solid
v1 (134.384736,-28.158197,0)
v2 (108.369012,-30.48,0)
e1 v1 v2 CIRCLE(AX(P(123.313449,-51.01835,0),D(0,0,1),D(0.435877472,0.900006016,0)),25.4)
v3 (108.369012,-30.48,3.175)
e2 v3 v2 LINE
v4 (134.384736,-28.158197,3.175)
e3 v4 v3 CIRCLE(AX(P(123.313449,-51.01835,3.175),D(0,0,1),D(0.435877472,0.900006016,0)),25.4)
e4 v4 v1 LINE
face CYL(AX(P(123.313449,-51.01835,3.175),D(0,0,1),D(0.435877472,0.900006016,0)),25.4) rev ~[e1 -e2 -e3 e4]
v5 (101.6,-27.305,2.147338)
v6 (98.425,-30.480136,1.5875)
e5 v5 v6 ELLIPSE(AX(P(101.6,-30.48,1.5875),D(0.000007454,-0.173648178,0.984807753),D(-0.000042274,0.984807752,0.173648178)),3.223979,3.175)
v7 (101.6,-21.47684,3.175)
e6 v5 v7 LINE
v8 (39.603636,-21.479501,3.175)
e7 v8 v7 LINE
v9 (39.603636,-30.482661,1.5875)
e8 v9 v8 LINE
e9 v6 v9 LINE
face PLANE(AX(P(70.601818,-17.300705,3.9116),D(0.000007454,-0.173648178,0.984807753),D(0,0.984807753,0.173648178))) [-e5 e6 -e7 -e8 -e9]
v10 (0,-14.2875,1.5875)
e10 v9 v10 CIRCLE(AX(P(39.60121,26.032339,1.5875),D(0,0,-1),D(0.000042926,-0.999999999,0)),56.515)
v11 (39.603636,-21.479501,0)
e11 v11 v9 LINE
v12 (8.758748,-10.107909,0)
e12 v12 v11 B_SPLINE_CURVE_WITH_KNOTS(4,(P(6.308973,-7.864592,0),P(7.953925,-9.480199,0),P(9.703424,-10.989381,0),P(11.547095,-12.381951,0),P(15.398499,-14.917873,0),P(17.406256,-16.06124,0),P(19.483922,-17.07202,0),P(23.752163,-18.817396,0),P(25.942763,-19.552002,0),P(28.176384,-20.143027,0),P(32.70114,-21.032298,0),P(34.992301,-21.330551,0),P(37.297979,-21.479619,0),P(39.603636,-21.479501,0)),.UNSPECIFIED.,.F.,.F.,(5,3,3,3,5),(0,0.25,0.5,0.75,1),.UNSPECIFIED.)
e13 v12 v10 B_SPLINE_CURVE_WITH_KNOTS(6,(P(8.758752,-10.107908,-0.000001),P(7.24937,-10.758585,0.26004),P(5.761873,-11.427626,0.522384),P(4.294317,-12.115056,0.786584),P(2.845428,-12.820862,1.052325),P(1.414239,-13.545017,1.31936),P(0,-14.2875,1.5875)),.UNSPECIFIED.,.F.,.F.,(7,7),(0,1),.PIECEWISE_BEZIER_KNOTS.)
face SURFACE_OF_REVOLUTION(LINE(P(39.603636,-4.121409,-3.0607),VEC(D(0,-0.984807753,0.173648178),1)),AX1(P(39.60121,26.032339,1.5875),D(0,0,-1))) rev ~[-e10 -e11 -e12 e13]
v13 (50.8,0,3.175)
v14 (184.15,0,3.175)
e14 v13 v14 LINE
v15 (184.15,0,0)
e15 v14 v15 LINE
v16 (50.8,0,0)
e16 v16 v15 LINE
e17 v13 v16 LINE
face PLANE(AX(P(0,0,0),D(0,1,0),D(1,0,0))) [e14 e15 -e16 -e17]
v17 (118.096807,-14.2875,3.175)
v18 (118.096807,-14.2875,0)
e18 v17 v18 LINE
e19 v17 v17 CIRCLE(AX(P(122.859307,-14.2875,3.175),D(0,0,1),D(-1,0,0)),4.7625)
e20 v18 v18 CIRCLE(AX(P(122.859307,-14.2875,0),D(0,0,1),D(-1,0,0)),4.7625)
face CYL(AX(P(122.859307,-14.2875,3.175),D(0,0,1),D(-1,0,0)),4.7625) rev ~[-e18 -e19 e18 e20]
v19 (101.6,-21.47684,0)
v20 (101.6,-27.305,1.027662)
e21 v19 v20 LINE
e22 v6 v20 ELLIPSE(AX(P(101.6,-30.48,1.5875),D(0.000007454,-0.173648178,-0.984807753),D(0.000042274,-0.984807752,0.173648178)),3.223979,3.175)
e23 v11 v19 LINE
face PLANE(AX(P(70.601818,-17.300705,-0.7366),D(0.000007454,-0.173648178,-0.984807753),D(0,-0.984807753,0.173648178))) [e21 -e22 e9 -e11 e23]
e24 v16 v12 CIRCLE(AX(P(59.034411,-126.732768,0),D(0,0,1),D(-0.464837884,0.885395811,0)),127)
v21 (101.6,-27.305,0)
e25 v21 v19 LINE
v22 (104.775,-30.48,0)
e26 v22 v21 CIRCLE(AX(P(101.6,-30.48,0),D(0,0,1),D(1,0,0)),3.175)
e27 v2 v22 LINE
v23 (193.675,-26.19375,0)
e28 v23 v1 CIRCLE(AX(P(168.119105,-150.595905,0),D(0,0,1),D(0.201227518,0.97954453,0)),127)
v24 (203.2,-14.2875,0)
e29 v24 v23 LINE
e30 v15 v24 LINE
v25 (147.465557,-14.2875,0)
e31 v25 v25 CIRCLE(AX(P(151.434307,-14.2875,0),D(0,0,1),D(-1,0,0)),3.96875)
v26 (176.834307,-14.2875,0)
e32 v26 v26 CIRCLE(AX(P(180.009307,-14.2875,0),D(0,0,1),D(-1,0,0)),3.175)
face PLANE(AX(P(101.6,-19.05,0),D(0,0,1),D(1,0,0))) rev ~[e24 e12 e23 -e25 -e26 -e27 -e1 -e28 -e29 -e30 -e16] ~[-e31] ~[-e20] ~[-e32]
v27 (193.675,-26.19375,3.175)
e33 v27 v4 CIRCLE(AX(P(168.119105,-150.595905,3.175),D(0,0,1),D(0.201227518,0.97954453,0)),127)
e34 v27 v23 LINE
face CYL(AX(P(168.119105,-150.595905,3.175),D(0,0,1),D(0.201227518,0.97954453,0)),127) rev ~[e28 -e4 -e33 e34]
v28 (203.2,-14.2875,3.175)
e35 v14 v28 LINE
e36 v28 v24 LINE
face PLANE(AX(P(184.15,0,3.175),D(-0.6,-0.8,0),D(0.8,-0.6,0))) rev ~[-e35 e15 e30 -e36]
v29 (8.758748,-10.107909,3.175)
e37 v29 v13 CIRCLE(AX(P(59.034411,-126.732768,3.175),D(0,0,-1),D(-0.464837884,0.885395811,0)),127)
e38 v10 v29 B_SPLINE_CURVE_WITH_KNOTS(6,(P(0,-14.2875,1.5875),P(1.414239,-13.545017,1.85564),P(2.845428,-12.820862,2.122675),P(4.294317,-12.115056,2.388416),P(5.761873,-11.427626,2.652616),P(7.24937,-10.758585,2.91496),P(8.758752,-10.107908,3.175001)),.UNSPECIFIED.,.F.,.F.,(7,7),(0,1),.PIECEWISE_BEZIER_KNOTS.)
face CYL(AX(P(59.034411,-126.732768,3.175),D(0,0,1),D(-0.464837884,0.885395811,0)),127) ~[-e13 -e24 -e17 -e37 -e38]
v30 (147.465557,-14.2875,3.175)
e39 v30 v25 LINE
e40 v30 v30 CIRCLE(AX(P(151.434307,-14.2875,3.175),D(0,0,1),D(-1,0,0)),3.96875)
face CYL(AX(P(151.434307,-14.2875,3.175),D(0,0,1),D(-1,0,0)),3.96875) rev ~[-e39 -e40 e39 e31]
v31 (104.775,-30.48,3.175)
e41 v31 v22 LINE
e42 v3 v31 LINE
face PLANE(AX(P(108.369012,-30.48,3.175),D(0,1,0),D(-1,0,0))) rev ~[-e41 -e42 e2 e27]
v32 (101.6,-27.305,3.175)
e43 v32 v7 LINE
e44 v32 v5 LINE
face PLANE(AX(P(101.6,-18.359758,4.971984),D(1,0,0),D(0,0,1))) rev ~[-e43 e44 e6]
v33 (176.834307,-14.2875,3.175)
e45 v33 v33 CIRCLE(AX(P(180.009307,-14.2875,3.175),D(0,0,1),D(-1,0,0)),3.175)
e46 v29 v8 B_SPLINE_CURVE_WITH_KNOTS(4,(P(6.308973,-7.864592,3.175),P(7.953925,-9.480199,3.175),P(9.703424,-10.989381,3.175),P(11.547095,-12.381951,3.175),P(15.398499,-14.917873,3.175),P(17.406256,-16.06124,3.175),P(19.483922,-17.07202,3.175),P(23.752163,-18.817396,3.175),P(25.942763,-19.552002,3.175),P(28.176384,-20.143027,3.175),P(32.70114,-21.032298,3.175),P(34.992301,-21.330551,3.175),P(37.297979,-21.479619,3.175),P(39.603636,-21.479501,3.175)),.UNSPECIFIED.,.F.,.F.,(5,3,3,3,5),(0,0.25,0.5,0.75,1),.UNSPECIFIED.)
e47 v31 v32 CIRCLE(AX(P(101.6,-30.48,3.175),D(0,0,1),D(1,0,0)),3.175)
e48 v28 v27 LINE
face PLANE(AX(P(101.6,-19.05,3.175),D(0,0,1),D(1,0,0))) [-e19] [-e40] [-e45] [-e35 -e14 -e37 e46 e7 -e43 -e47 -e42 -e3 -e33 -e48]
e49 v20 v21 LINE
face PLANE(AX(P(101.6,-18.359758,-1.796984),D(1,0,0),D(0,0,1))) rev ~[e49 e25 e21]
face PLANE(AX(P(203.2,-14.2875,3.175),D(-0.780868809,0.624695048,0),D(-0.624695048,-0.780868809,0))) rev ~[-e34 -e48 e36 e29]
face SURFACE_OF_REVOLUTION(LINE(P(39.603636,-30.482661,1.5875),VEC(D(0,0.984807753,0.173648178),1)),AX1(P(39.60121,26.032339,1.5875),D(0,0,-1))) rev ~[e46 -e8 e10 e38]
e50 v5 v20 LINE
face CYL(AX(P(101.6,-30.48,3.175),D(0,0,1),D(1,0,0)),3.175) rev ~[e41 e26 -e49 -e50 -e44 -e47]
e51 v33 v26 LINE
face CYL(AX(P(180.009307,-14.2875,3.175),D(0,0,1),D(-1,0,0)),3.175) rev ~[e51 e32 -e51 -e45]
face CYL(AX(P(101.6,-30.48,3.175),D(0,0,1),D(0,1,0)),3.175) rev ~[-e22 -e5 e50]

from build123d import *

# Parameters (mm, degrees)
F0_W     = 203.2
F0_H     = 38.1
F1_DEPTH = 3.175
F2_W     = 3.175
F2_H     = 4.445
F3_DEPTH = 25.4


# Not quite as in the source:
# - a feature names something its author has since deleted; it is built from what else it names


with BuildPart() as f1:
    # F0 (on Top) → F1 (new body)
    with BuildSketch(Plane.XY):
        with Locations((101.6, -19.05)):
            Rectangle(F0_W, F0_H)
    extrude(amount=F1_DEPTH)

    # F2 (on face) → F3 (cut)
    with BuildSketch(Plane.XY.offset(3.175)):
        with BuildLine():
            Line((0, -9.525), (0, -14.2875))
            ThreePointArc((0, -14.2875), (24.649723028, -4.4760985439), (50.8, 0))
            Line((50.8, 0), (0, 0))
            Line((0, 0), (0, -9.525))
        make_face()
        with Locations((103.1875, -35.8775)):
            Rectangle(F2_W, F2_H)
        with BuildLine():
            ThreePointArc((104.775, -30.48), (103.8450640303, -32.7250640303), (101.6, -33.655))
            Line((101.6, -33.655), (104.775, -33.655))
            Line((104.775, -33.655), (104.775, -30.48))
        make_face()
        with BuildLine():
            Line((104.775, -30.48), (101.6, -30.48))
            Line((101.6, -30.48), (101.6, -33.655))
            ThreePointArc((101.6, -33.655), (103.8450640303, -32.7250640303), (104.775, -30.48))
        make_face()
        with BuildLine():
            Line((101.6, -27.305), (101.6, -30.48))
            Line((101.6, -30.48), (104.775, -30.48))
            ThreePointArc((104.775, -30.48), (103.8450640303, -28.2349359697), (101.6, -27.305))
        make_face()
        with BuildLine():
            Line((98.4250000029, -30.4801362911), (101.6, -30.48))
            Line((101.6, -30.48), (101.6, -27.305))
            ThreePointArc((101.6, -27.305), (99.3548877841, -28.2349841564), (98.4250000029, -30.4801362911))
        make_face()
        with BuildLine():
            Line((101.6, -33.655), (101.6, -30.48))
            Line((101.6, -30.48), (98.4250000029, -30.4801362911))
            ThreePointArc((98.4250000029, -30.4801362911), (99.3549841564, -32.7251122159), (101.6, -33.655))
        make_face()
        with BuildLine():
            ThreePointArc((108.3690122037, -30.48), (106.4969075417, -31.9824905065), (104.775, -33.655))
            Line((104.775, -33.655), (104.775, -38.1))
            Line((104.775, -38.1), (184.15, -38.1))
            Line((184.15, -38.1), (193.675, -26.19375))
            ThreePointArc((193.675, -26.19375), (163.9135585822, -23.6655567526), (134.3847364187, -28.1581971794))
            ThreePointArc((134.3847364187, -28.1581971794), (121.0555708247, -25.7189035938), (108.3690122037, -30.48))
        make_face()
        with BuildLine():
            Line((101.6, -38.1), (101.6, -33.655))
            ThreePointArc((101.6, -33.655), (99.3549841564, -32.7251122159), (98.4250000029, -30.4801362911))
            Line((98.4250000029, -30.4801362911), (39.6036359929, -30.4826612755))
            ThreePointArc((39.6036359929, -30.4826612755), (18.2099329026, -26.2778753266), (0, -14.2875))
            Line((0, -14.2875), (0, -19.05))
            Line((0, -19.05), (0, -38.1))
            Line((0, -38.1), (101.6, -38.1))
        make_face()
        Polygon((203.2, 0), (184.15, 0), (203.2, -14.2875), align=None)
        Polygon((193.675, -26.19375), (184.15, -38.1), (203.2, -38.1), (203.2, -19.05), (203.2, -14.2875), align=None)
        with BuildLine():
            Line((108.3690122037, -30.48), (104.775, -30.48))
            Line((104.775, -30.48), (104.775, -33.655))
            ThreePointArc((104.775, -33.655), (106.4969075417, -31.9824905065), (108.3690122037, -30.48))
        make_face()
        with BuildLine():
            ThreePointArc((127.6218066335, -14.2875), (122.8593066335, -9.525), (118.0968066335, -14.2875))
            Line((118.0968066335, -14.2875), (127.6218066335, -14.2875))
        make_face()
        with BuildLine():
            Line((127.6218066335, -14.2875), (118.0968066335, -14.2875))
            ThreePointArc((118.0968066335, -14.2875), (122.8593066335, -19.05), (127.6218066335, -14.2875))
        make_face()
        with BuildLine():
            Line((176.8343066335, -14.2875), (183.1843066335, -14.2875))
            ThreePointArc((183.1843066335, -14.2875), (180.0093066335, -11.1125), (176.8343066335, -14.2875))
        make_face()
        with BuildLine():
            ThreePointArc((176.8343066335, -14.2875), (180.0093066335, -17.4625), (183.1843066335, -14.2875))
            Line((183.1843066335, -14.2875), (176.8343066335, -14.2875))
        make_face()
        with BuildLine():
            ThreePointArc((155.4030566335, -14.2875), (151.4343066335, -10.31875), (147.4655566335, -14.2875))
            Line((147.4655566335, -14.2875), (155.4030566335, -14.2875))
        make_face()
        with BuildLine():
            Line((155.4030566335, -14.2875), (147.4655566335, -14.2875))
            ThreePointArc((147.4655566335, -14.2875), (151.4343066335, -18.25625), (155.4030566335, -14.2875))
        make_face()
    extrude(amount=-F3_DEPTH, mode=Mode.SUBTRACT)

    # F8: sweep along a path in F5
    with BuildLine(Plane.XY.offset(1.5875)) as f8_path:
        Line((101.6, -30.48), (39.6036359929, -30.4826612755))
        ThreePointArc((39.6036359929, -30.4826612755), (18.2099329026, -26.2778753266), (0, -14.2875))
    # F7 (on offset) → F8 (sweep, cut)
    with BuildSketch(Plane.YZ.offset(101.6)):
        Polygon((-30.48, 3.1877), (-30.48, 1.5875), (-4.1187478461, 6.2357), (-30.48, 6.2357), align=None)
        Polygon((-30.48, 1.5875), (-30.48, 0), (-30.48, -3.0607), (-4.1187478461, -3.0607), align=None)
    sweep(path=f8_path.line, mode=Mode.SUBTRACT)


solid = f1.part
